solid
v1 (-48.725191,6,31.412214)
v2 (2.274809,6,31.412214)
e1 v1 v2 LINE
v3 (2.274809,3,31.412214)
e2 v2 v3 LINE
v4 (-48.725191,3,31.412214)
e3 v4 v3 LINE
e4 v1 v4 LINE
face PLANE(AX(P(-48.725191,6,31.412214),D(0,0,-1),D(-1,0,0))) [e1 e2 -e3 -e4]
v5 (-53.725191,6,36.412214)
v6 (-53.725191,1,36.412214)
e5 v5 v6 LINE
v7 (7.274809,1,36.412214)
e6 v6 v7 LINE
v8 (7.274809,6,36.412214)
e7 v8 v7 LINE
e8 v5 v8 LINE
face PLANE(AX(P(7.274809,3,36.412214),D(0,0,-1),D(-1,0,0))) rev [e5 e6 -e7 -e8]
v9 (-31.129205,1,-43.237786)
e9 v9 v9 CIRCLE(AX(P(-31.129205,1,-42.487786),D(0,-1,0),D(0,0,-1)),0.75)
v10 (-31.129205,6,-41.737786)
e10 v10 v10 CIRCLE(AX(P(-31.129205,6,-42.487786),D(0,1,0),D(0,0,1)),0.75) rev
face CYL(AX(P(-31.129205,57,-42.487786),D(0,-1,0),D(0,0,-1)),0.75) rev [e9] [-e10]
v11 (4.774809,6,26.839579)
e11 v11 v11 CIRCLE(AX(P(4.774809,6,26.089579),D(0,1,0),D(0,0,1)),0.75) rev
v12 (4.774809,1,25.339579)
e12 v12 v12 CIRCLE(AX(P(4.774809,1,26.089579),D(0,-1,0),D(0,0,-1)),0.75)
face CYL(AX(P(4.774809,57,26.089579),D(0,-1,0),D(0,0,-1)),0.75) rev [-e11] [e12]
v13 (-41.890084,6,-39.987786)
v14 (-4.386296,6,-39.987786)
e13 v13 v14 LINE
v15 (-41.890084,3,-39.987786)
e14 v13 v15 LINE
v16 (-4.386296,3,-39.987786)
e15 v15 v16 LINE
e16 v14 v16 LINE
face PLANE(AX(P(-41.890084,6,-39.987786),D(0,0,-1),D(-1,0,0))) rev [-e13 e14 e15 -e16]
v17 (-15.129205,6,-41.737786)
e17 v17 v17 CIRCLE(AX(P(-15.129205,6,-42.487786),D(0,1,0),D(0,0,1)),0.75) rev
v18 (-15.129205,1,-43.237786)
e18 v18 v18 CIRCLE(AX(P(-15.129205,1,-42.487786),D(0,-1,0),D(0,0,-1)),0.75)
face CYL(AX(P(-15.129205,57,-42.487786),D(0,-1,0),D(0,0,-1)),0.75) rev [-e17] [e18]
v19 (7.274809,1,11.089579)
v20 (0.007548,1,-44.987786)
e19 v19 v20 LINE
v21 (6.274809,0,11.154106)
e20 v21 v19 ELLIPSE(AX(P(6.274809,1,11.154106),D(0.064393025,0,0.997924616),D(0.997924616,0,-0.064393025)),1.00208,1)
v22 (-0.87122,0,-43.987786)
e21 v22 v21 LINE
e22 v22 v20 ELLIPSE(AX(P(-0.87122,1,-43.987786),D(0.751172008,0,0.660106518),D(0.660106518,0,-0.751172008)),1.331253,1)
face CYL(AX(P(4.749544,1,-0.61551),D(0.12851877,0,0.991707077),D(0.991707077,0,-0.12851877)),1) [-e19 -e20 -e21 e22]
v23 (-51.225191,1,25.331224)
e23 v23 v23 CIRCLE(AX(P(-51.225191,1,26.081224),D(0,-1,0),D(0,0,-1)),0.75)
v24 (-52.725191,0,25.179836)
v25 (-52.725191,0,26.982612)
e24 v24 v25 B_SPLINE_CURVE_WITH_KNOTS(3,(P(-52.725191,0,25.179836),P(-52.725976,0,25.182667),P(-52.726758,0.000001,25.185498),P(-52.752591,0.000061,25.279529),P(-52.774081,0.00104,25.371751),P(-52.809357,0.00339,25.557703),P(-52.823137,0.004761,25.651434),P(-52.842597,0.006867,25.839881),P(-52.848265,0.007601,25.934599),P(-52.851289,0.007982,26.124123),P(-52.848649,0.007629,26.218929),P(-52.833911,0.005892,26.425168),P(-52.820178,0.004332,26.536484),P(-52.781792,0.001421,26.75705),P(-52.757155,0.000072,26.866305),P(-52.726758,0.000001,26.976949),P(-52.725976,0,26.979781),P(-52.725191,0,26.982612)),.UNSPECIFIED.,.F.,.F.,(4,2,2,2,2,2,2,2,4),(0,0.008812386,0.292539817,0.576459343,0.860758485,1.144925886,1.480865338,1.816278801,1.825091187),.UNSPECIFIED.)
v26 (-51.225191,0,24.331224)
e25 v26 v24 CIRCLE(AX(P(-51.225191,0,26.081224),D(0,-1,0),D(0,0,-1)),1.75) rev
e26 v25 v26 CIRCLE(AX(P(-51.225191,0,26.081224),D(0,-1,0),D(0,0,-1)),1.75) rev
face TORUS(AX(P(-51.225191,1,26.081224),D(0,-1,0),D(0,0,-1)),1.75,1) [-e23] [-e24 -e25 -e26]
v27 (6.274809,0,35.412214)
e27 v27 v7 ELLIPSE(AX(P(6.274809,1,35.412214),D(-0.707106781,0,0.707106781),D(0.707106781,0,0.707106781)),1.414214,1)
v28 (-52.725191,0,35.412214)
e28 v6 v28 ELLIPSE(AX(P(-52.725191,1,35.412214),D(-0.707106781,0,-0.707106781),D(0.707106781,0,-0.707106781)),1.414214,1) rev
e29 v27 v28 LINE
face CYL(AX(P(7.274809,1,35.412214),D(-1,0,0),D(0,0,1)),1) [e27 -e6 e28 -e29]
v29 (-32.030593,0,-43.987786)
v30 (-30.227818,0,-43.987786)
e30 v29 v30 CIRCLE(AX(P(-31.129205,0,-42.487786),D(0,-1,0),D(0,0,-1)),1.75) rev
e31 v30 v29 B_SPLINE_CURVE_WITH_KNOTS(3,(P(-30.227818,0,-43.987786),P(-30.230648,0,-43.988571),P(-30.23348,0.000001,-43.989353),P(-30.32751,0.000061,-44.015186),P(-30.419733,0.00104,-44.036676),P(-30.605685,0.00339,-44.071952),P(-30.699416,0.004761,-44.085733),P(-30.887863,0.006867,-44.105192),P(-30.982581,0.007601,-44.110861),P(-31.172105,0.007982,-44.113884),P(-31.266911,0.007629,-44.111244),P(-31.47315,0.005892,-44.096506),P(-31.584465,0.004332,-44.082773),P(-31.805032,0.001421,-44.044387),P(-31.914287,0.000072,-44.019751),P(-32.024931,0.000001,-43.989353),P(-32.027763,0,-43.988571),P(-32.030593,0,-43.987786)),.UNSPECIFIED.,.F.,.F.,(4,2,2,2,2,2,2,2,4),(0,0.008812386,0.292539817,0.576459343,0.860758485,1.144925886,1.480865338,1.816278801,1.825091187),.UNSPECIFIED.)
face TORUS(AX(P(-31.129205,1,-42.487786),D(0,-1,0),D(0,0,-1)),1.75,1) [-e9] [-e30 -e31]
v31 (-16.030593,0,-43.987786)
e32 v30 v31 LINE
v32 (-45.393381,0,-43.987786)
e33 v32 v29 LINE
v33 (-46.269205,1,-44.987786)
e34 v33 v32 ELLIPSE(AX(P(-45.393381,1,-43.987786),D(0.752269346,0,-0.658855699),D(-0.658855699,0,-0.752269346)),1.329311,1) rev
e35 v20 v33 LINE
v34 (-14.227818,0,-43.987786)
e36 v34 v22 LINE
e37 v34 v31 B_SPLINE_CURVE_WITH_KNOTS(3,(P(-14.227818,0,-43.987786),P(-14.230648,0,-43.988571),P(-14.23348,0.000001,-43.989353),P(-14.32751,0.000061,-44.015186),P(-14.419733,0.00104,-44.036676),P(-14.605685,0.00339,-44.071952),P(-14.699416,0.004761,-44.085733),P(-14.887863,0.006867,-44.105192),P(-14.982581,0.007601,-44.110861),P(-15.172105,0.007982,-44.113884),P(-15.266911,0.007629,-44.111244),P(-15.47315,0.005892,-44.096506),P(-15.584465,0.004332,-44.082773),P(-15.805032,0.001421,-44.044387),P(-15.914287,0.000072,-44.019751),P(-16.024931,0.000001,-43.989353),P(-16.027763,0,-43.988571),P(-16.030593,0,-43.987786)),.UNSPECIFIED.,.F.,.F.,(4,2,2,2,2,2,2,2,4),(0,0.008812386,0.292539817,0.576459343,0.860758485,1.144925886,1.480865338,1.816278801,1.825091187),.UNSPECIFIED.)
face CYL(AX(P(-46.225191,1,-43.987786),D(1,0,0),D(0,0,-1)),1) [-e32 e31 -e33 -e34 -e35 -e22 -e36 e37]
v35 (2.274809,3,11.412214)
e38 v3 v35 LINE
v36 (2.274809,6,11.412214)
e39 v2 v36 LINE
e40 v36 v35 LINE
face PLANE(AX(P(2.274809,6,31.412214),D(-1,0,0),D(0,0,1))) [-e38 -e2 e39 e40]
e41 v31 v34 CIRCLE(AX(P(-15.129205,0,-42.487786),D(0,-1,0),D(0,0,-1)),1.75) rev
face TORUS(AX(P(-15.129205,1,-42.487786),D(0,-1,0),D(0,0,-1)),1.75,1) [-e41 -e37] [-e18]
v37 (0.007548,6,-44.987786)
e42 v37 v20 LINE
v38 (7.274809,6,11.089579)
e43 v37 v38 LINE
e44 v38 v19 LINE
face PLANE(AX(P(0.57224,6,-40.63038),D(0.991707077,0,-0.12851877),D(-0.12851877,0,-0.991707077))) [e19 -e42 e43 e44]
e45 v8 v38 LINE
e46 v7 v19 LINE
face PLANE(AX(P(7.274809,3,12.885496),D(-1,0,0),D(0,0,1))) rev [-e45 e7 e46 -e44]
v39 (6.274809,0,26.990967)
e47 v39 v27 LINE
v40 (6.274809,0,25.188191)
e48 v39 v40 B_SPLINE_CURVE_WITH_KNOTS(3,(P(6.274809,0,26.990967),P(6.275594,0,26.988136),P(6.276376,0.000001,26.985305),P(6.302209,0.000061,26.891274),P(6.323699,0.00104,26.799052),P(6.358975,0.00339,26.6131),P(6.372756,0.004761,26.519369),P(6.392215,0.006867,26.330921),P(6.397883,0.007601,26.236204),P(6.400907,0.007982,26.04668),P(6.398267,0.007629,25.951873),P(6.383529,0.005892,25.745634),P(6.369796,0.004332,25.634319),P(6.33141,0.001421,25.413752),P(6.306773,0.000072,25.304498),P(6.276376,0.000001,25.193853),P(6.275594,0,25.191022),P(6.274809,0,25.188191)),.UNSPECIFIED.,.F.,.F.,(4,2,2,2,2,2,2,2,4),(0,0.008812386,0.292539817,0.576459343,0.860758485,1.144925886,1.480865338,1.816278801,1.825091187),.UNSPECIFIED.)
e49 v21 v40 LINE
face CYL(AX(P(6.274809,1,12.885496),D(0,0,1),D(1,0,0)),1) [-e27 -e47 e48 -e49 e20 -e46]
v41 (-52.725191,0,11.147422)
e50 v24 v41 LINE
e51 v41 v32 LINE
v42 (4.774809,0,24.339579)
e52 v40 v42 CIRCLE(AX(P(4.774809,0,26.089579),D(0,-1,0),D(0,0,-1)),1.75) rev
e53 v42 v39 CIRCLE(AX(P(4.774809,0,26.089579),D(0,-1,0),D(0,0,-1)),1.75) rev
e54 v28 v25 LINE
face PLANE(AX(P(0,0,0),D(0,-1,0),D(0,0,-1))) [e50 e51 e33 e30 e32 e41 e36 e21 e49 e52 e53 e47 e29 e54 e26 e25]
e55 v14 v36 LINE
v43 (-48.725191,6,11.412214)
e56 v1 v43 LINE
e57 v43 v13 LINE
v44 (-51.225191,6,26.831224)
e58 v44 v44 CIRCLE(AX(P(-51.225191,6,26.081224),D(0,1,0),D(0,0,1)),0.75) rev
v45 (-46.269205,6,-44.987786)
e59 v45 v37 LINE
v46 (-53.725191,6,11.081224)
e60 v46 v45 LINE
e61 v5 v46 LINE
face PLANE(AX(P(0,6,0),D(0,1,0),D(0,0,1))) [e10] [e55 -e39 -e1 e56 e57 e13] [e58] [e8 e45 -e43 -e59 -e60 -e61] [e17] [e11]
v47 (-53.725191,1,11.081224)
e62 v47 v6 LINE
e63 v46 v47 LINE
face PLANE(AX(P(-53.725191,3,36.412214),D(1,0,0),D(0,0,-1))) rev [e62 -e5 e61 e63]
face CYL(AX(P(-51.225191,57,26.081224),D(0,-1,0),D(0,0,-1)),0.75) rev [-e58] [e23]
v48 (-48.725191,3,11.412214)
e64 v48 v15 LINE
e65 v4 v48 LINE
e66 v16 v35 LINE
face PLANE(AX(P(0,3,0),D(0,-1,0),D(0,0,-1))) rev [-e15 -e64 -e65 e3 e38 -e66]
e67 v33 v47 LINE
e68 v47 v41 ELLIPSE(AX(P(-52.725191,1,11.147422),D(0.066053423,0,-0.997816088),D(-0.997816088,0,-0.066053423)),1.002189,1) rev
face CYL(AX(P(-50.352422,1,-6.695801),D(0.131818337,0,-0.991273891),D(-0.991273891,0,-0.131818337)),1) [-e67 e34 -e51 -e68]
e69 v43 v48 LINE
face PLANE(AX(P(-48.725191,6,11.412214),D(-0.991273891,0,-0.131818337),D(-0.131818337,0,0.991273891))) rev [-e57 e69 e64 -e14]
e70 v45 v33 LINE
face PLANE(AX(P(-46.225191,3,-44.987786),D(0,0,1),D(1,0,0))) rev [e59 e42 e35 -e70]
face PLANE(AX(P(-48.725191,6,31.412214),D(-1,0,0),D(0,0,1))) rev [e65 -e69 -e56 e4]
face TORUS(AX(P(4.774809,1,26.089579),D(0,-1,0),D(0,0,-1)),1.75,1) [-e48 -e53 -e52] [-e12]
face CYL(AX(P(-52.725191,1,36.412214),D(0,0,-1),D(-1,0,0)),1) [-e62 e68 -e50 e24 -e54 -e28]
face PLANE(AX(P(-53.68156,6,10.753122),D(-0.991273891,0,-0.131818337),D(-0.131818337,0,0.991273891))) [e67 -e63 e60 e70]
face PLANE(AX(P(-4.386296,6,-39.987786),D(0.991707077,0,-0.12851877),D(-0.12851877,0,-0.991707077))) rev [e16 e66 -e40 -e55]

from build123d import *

# Parameters (mm, degrees)
DODANIE_WYCI_GNI_CIE1_DEPTH       = 3
WYCI_GNI_CIE_CIENKA_CIANKA1_DEPTH = 6
WYTNIJ_WYCI_GNI_CIE1_DEPTH        = 51
WYTNIJ_WYCI_GNI_CIE1_DEPTH_BACK   = 39
SZKIC5_R                          = 0.75
ZAOKR_GLENIE1_R                   = 1


with BuildPart() as part:
    # Szkic1 → Dodanie-wyciągnięcie1 (new body)
    with BuildSketch(Plane(origin=(0, 0, 0), x_dir=(1, 0, 0), z_dir=(0, 1, 0))):
        Polygon((-46.22519084, 44.98778626), (-0.22519084, 44.98778626), (7.27480916, -12.885496183), (7.27480916, -36.41221374), (-53.72519084, -36.41221374), (-53.72519084, -11.41221374), align=None)
    extrude(amount=DODANIE_WYCI_GNI_CIE1_DEPTH)

    # Szkic3 → Wyciągnięcie-cienka ścianka1 (add)
    with BuildSketch(Plane(origin=(0, 0, 0), x_dir=(1, 0, 0), z_dir=(0, 1, 0))):
        Polygon((7.27480916, -11.089579023), (0.007548313, 44.98778626), (-46.269205463, 44.98778626), (-53.72519084, -11.081223772), (-53.72519084, -36.41221374), (7.27480916, -36.41221374), align=None)
        Polygon((2.27480916, -11.41221374), (-4.386295649, 39.98778626), (-41.890084457, 39.98778626), (-48.72519084, -11.41221374), (-48.72519084, -31.41221374), (2.27480916, -31.41221374), align=None, mode=Mode.SUBTRACT)
    extrude(amount=WYCI_GNI_CIE_CIENKA_CIANKA1_DEPTH)

    # Szkic5 → Wytnij-wyciągnięcie1 (cut, two sides: drawn at the far end of the back side and taken through both)
    with BuildSketch(Plane(origin=(0, 6, 0), x_dir=(1, 0, 0), z_dir=(0, 1, 0)).offset(-WYTNIJ_WYCI_GNI_CIE1_DEPTH_BACK)):
        with Locations(Location((-31.129205463, 42.48778626, 0), (0, 0, 90))):
            Circle(SZKIC5_R)
        with Locations(Location((-15.129205463, 42.48778626, 0), (0, 0, 90))):
            Circle(SZKIC5_R)
        with Locations(Location((-51.22519084, -26.081223772, 0), (0, 0, 90))):
            Circle(SZKIC5_R)
        with Locations(Location((4.77480916, -26.089579023, 0), (0, 0, 90))):
            Circle(SZKIC5_R)
    extrude(amount=WYTNIJ_WYCI_GNI_CIE1_DEPTH + WYTNIJ_WYCI_GNI_CIE1_DEPTH_BACK, mode=Mode.SUBTRACT)

    # Zaokrąglenie1
    # the kernel refuses this fillet: 1 mm, written as the material it takes off along each edge
    with BuildSketch(Plane(origin=(-45.939659622, 0, -47.465970986), x_dir=(0, 1, 0), z_dir=(-0.13181833651416436, 0, 0.9912738905865718))) as zaokr_glenie1_piece_1:
        with BuildLine():
            CenterArc((ZAOKR_GLENIE1_R, -ZAOKR_GLENIE1_R), ZAOKR_GLENIE1_R, 90, 90)
            Line((0, -ZAOKR_GLENIE1_R), (0, 0))
            Line((0, 0), (ZAOKR_GLENIE1_R, 0))
        make_face()
    extrude(amount=61.562581305, mode=Mode.SUBTRACT)
    with BuildSketch(Plane(origin=(7.596106085, 0, 13.568846714), x_dir=(0, 1, 0), z_dir=(-0.12851876998328252, 0, -0.9917070765916638))) as zaokr_glenie1_piece_2:
        with BuildLine():
            CenterArc((ZAOKR_GLENIE1_R, -ZAOKR_GLENIE1_R), ZAOKR_GLENIE1_R, 90, 90)
            Line((0, -ZAOKR_GLENIE1_R), (0, 0))
            Line((0, 0), (ZAOKR_GLENIE1_R, 0))
        make_face()
    extrude(amount=61.546299413, mode=Mode.SUBTRACT)
    with BuildSketch(Plane(origin=(2.507548313, 0, -44.98778626), x_dir=(0, 1, 0), z_dir=(-1, 0, 0))) as zaokr_glenie1_piece_3:
        with BuildLine():
            CenterArc((ZAOKR_GLENIE1_R, -ZAOKR_GLENIE1_R), ZAOKR_GLENIE1_R, 90, 90)
            Line((0, -ZAOKR_GLENIE1_R), (0, 0))
            Line((0, 0), (ZAOKR_GLENIE1_R, 0))
        make_face()
    extrude(amount=51.276753776, mode=Mode.SUBTRACT)
    with BuildSketch(Plane(origin=(-51.22519084, 0, 26.081223772), x_dir=(0, 0, -1), z_dir=(1, 0, 0))) as zaokr_glenie1_piece_4:
        with BuildLine():
            CenterArc((0.75 + ZAOKR_GLENIE1_R, ZAOKR_GLENIE1_R), ZAOKR_GLENIE1_R, 180, 90)
            Line((0.75, ZAOKR_GLENIE1_R), (0.75, 0))
            Line((0.75, 0), (0.75 + ZAOKR_GLENIE1_R, 0))
        make_face()
    revolve(axis=Axis((-51.22519084, 0, 26.081223772), (0, 1, 0)), mode=Mode.SUBTRACT)
    with BuildSketch(Plane(origin=(4.77480916, 0, 26.089579023), x_dir=(0, 0, -1), z_dir=(1, 0, 0))) as zaokr_glenie1_piece_5:
        with BuildLine():
            CenterArc((0.75 + ZAOKR_GLENIE1_R, ZAOKR_GLENIE1_R), ZAOKR_GLENIE1_R, 180, 90)
            Line((0.75, ZAOKR_GLENIE1_R), (0.75, 0))
            Line((0.75, 0), (0.75 + ZAOKR_GLENIE1_R, 0))
        make_face()
    revolve(axis=Axis((4.77480916, 0, 26.089579023), (0, 1, 0)), mode=Mode.SUBTRACT)
    with BuildSketch(Plane(origin=(7.27480916, 0, 8.589579023), x_dir=(-1, 0, 0), z_dir=(0, 0, 1))) as zaokr_glenie1_piece_6:
        with BuildLine():
            CenterArc((ZAOKR_GLENIE1_R, -ZAOKR_GLENIE1_R), ZAOKR_GLENIE1_R, 90, 90)
            Line((0, -ZAOKR_GLENIE1_R), (0, 0))
            Line((0, 0), (ZAOKR_GLENIE1_R, 0))
        make_face()
    extrude(amount=30.322634717, mode=Mode.SUBTRACT)
    with BuildSketch(Plane(origin=(-15.129205463, 0, -42.48778626), x_dir=(0, 0, -1), z_dir=(1, 0, 0))) as zaokr_glenie1_piece_7:
        with BuildLine():
            CenterArc((0.75 + ZAOKR_GLENIE1_R, ZAOKR_GLENIE1_R), ZAOKR_GLENIE1_R, 180, 90)
            Line((0.75, ZAOKR_GLENIE1_R), (0.75, 0))
            Line((0.75, 0), (0.75 + ZAOKR_GLENIE1_R, 0))
        make_face()
    revolve(axis=Axis((-15.129205463, 0, -42.48778626), (0, 1, 0)), mode=Mode.SUBTRACT)
    with BuildSketch(Plane(origin=(9.77480916, 0, 36.41221374), x_dir=(0, 0, -1), z_dir=(-1, 0, 0))) as zaokr_glenie1_piece_8:
        with BuildLine():
            CenterArc((ZAOKR_GLENIE1_R, -ZAOKR_GLENIE1_R), ZAOKR_GLENIE1_R, 90, 90)
            Line((0, -ZAOKR_GLENIE1_R), (0, 0))
            Line((0, 0), (ZAOKR_GLENIE1_R, 0))
        make_face()
    extrude(amount=66, mode=Mode.SUBTRACT)
    with BuildSketch(Plane(origin=(-31.129205463, 0, -42.48778626), x_dir=(0, 0, -1), z_dir=(1, 0, 0))) as zaokr_glenie1_piece_9:
        with BuildLine():
            CenterArc((0.75 + ZAOKR_GLENIE1_R, ZAOKR_GLENIE1_R), ZAOKR_GLENIE1_R, 180, 90)
            Line((0.75, ZAOKR_GLENIE1_R), (0.75, 0))
            Line((0.75, 0), (0.75 + ZAOKR_GLENIE1_R, 0))
        make_face()
    revolve(axis=Axis((-31.129205463, 0, -42.48778626), (0, 1, 0)), mode=Mode.SUBTRACT)
    with BuildSketch(Plane(origin=(-53.72519084, 0, 38.91221374), x_dir=(1, 0, 0), z_dir=(0, 0, -1))) as zaokr_glenie1_piece_10:
        with BuildLine():
            CenterArc((ZAOKR_GLENIE1_R, -ZAOKR_GLENIE1_R), ZAOKR_GLENIE1_R, 90, 90)
            Line((0, -ZAOKR_GLENIE1_R), (0, 0))
            Line((0, 0), (ZAOKR_GLENIE1_R, 0))
        make_face()
    extrude(amount=30.330989969, mode=Mode.SUBTRACT)


solid = part.part
